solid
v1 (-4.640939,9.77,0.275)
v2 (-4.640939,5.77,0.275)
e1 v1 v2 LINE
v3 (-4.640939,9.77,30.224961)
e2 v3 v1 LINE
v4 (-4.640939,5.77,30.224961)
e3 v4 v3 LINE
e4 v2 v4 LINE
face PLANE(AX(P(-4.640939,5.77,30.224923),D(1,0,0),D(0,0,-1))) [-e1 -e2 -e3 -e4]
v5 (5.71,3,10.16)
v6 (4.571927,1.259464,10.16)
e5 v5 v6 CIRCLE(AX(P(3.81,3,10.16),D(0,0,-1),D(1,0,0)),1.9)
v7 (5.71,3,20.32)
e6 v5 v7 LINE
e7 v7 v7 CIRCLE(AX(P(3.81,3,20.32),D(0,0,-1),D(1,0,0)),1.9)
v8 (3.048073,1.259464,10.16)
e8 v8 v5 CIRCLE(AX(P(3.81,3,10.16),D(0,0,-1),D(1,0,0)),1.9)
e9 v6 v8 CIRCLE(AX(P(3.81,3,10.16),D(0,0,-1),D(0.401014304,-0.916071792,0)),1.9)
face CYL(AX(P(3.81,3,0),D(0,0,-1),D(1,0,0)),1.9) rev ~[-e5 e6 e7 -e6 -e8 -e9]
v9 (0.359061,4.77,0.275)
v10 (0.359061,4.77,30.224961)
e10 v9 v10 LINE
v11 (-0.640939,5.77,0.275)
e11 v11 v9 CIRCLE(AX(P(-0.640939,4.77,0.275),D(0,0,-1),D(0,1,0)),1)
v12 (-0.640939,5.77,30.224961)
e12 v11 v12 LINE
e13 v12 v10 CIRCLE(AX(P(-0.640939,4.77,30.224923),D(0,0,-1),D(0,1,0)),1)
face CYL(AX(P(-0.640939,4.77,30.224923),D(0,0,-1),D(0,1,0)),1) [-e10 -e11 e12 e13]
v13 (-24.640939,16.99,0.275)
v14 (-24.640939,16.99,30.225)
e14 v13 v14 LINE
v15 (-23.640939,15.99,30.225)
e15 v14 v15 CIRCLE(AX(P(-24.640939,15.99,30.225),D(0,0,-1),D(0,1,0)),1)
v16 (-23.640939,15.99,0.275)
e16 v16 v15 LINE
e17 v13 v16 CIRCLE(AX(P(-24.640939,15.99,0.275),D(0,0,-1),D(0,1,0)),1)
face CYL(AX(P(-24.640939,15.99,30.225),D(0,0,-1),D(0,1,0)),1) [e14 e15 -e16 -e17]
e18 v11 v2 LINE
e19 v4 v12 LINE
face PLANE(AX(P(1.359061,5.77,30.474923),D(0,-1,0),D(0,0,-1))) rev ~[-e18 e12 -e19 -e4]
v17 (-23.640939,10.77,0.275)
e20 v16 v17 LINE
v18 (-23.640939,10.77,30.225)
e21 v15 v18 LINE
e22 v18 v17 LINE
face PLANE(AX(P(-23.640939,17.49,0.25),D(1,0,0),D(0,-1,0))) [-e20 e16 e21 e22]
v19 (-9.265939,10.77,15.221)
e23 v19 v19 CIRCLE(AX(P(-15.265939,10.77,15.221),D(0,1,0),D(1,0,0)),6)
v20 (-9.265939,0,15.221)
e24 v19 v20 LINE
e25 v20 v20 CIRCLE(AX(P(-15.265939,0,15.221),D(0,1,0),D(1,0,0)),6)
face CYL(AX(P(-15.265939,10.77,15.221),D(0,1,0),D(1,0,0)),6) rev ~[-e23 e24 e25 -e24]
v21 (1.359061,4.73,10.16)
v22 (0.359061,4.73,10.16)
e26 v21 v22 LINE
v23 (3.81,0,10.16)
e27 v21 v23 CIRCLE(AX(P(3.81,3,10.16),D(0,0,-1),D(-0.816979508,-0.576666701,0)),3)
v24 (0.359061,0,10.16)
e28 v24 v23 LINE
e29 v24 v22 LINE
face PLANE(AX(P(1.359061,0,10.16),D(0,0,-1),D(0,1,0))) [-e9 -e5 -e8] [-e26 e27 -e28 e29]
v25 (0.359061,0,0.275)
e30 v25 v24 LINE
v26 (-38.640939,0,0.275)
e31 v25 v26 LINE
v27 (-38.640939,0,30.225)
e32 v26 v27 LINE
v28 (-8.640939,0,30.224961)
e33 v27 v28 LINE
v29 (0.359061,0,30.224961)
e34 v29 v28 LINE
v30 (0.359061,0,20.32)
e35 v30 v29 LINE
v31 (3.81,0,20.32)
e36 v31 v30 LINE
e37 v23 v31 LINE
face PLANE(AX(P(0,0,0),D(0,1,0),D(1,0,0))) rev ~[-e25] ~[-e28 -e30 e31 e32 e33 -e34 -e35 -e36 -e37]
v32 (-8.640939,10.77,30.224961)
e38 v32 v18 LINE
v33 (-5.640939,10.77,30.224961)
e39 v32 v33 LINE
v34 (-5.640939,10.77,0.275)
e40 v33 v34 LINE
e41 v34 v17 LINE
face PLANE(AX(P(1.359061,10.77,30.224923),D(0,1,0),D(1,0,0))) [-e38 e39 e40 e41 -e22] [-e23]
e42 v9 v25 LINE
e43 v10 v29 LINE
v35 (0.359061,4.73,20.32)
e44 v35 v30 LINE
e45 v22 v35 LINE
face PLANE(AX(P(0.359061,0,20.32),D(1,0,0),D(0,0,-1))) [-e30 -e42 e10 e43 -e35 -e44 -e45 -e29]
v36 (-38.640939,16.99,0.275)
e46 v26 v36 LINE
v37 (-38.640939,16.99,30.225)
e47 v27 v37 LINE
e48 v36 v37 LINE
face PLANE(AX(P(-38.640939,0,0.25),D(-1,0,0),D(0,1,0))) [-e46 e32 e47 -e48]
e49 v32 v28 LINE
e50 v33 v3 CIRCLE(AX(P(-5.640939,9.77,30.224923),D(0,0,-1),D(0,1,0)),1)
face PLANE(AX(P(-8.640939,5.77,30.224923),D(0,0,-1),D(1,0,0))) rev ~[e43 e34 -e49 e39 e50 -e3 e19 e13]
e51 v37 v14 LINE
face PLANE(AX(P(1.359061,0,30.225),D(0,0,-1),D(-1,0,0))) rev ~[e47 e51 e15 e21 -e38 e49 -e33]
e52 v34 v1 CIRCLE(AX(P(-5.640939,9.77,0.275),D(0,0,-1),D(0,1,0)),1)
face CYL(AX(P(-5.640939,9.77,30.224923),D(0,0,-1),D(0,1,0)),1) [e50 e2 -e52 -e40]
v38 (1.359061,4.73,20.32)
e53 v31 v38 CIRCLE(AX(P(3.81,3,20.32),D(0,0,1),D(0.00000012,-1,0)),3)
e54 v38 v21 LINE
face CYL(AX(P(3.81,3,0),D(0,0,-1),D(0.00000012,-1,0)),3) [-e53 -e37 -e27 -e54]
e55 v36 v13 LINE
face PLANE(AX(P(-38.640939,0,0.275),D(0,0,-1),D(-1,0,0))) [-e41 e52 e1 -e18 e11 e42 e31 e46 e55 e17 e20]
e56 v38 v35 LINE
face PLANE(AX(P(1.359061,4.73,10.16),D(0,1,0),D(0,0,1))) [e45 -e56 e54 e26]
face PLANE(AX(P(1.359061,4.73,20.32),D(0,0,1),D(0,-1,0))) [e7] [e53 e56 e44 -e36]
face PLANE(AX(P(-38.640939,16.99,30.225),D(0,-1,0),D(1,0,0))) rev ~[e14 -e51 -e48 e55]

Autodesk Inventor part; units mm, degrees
ref_plane "YZ Plane" through (0, 0, 0) normal (1, 0, 0) x (0, 1, 0)
sketch "Sketch1" plane through (0, 0, 0) normal (0, 0, 1) x (1, 0, 0)
  line L0 (0, 0) -> (3.81, 0)
  line L1 (0, 0) -> (0, 1.27)
  arc A0 (3.81, 0) -> (1.359061, 1.27) centre (3.81, 3) ccw
  circle A1 centre (3.81, 3) radius 1.9
  line L2 (0, 1.27) -> (1.359061, 1.27)
  dimension "d0" = 3.81
  dimension "d1" = 1.27
  dimension "d2" = 6
  dimension "d3" = 3.8
extrude "Extrusion1" add sketch "Sketch1" along normal blind 30.48
ref_plane "Work Plane1" through (0, 0, 20.32) normal (0, 0, 1) x (1, 0, 0)
sketch "Sketch2" plane through (0, 0, 20.32) normal (0, 0, 1) x (1, 0, 0)
  arc A0 (3.81, 0) -> (1.359061, 1.27) centre (3.81, 3) ccw
  line L0 (2.54, 1.27) -> (2.54, 0)
  line L1 (0, 0) -> (3.81, 0)
  line L2 (2.54, 0) -> (3.81, 0)
  circle A1 centre (3.81, 3) radius 0.762
sketch "Sketch2 outline for Extrusion5" plane through (0, 0, 20.32) normal (0, 0, 1) x (1, 0, 0)
  line L0 (2.54, 0) -> (3.81, 0)
  line L1 (1.359061, 1.27) -> (2.54, 0)
  arc A0 (3.81, 0) -> (1.359061, 1.27) centre (3.81, 3) ccw
  circle A1 centre (3.81, 3) radius 0.762
extrude "Extrusion5" cut sketch "Sketch2 outline for Extrusion5" along normal blind 25.4
ref_plane "Work Plane3" through (0, 0, 10.16) normal (0, 0, -1) x (-1, 0, 0)
sketch "Sketch6" plane through (0, 0, 10.16) normal (0, 0, -1) x (-1, 0, 0)
  line L0 (-1.359061, 1.27) -> (-2.54, 0)
  line L1 (-1.359061, 1.27) -> (-2.54, 0)
  circle A0 centre (-3.81, 1.27) radius 0.762
  arc A1 (-1.359061, 1.27) -> (-3.81, 0) centre (-3.81, 3) ccw
  line L2 (-2.54, 0) -> (-3.81, 0)
  point P0 (0, 0)
extrude "Extrusion6" cut sketch "Sketch6" along normal blind 25.4
sketch "Sketch8" plane through (0, 0, 30.48) normal (0, 0, 1) x (1, 0, 0)
  line L0 (1.633512, 1.27) -> (1.633512, 0)
  line L1 (1.633512, 1.27) -> (1.633512, 0)
  line L2 (1.359061, 1.27) -> (2.54, 0)
  line L3 (1.633512, 0) -> (2.54, 0)
  line L4 (1.359061, 1.27) -> (0, 1.27)
  line L5 (2.54, 0) -> (1.633512, 1.27)
  point P0 (0, 0)
extrude "Extrusion8" cut sketch "Sketch8" against normal blind 10.16
sketch "Sketch9" plane through (0, 0, 0) normal (0, 0, -1) x (-1, 0, 0)
  arc A0 (-4.571927, 1.259464) -> (-3.048073, 1.259464) centre (-3.81, 1.27) ccw
  arc A1 (-4.571927, 1.259464) -> (-3.048073, 1.259464) centre (-3.81, 3) ccw
  point P0 (0, 0)
extrude "Extrusion9" cut sketch "Sketch9" against normal blind 10.16
sketch "Sketch10" plane through (0, 0, 0) normal (0, 0, -1) x (-1, 0, 0)
  line L0 (-1.359061, 1.27) -> (0, 1.27)
  line L1 (-1.359061, 1.27) -> (-1.359061, 0)
  line L2 (-1.359061, 0) -> (-2.542741, 0)
  line L3 (-2.542741, 0) -> (-1.359061, 1.27)
  point P0 (0, 0)
extrude "Extrusion10" cut sketch "Sketch10" against normal blind 10.16
sketch "Sketch11" plane through (0, 0, 30.48) normal (0, 0, 1) x (1, 0, 0)
  line L0 (1.359061, 1.27) -> (1.633512, 1.27)
  line L1 (1.359061, 1.27) -> (1.633512, 0.974851)
  line L2 (1.633512, 1.27) -> (1.633512, 0.974851)
  line L3 (1.633512, 0.974851) -> (1.359061, 1.27)
  point P0 (0, 0)
extrude "Extrusion11" add sketch "Sketch11" against normal blind 10.16
sketch "Sketch12" plane through (0, 1.27, 30.48) normal (0, 1, 0) x (1, 0, 0)
  line L0 (1.359061, 30.48) -> (1.359061, 20.32)
  line L1 (1.359061, 30.48) -> (-8.640939, 30.48)
  line L2 (-8.640939, 30.48) -> (-8.640939, 0)
  line L3 (-8.640939, 0) -> (1.359061, 0)
  line L4 (1.359061, 0) -> (1.359061, 30.48)
  point P0 (0, 30.48)
  dimension "d34" = 10
extrude "Extrusion12" add sketch "Sketch12" against normal blind 1.27
sketch "Sketch13" plane through (1.633512, 1.27, 30.48) normal (0, 1, 0) x (1, 0, 0)
  line L0 (-0.274451, 30.48) -> (-0.274451, 20.32)
  line L1 (-0.274451, 20.32) -> (-0.274451, 0)
  line L2 (-0.274451, 0) -> (1.648434, 0)
  line L3 (1.648434, 0) -> (1.648434, 10.16)
  line L4 (2.176488, 10.16) -> (0, 10.16)
  line L5 (-0.274451, 10.16) -> (1.648434, 10.16)
  point P0 (-1.633512, 30.48)
extrude "Extrusion13" cut sketch "Sketch13" against normal blind 1.27
sketch "Sketch14" plane through (1.359061, 0, 0) normal (1, 0, 0) x (0, 0, -1)
  line L0 (-30.474923, 6.35) -> (0.005077, 6.35)
  line L1 (0.005077, 6.35) -> (0.005077, 0)
  line L2 (0, 1.27) -> (-30.48, 1.27)
  line L3 (0, 1.27) -> (-30.474923, 1.27)
  line L4 (-30.474923, 1.27) -> (-30.474923, 5.77)
  line L5 (-30.474923, 5.77) -> (0, 5.77)
  line L6 (0, 5.77) -> (0, 1.27)
  point P0 (0, 0)
  dimension "d39" = 4.5
extrude "Extrusion14" add sketch "Sketch14" against normal blind 10
sketch "Sketch15" plane through (1.359061, 0, 20.32) normal (1, 0, 0) x (0, 0, -1)
  line L0 (-10.154923, 5.77) -> (20.32, 5.77)
  line L1 (20.32, 0) -> (20.07, 0)
  line L2 (20.07, 0) -> (20.07, 5.77)
  line L3 (20.07, 5.77) -> (20.32, 5.77)
  line L4 (20.32, 5.77) -> (20.32, 0)
  line L5 (-10.154923, 5.77) -> (20.32, 5.77)
  line L6 (5.082538, 5.77) -> (5.082538, 11.076995)
  line L7 (-10.154923, 0) -> (-9.904923, 0)
  line L8 (-9.904923, 0) -> (-9.904923, 5.77)
  line L9 (-10.154923, 5.77) -> (-10.154923, 0)
  line L10 (-10.154923, 0) -> (-9.904923, 0)
  line L11 (-9.904923, 0) -> (-9.904923, 5.77)
  line L12 (-9.904923, 5.77) -> (-10.154923, 5.77)
  line L13 (-10.154923, 5.77) -> (-10.154923, 0)
  dimension "d42" = 0.25
extrude "Extrusion15" cut sketch "Sketch15" against normal blind 10
sketch "Sketch16" plane through (1.359061, 0, 30.474923) normal (0, 0, -1) x (-1, 0, 0)
  line L0 (0, 1.27) -> (10, 1.27) projected
  line L1 (0, 0) -> (0, 1.27) projected
  line L2 (10, 0) -> (0, 0) projected
  line L3 (10, 1.27) -> (10, 0) projected
  point P0 (1.359061, 0)
extrude "Extrusion16" cut sketch "Sketch16" against normal blind 10
sketch "Sketch17" plane through (1.359061, 5.77, 30.224923) normal (0, 1, 0) x (1, 0, 0)
  line L0 (-5, 33.422895) -> (-5, -3.422186)
  line L1 (0, 29.974923) -> (-10, 29.974923)
  line L2 (-10, 0) -> (-10, 29.974923)
  line L3 (-5, 29.974923) -> (-10, 29.974923)
  line L4 (-10, 29.974923) -> (-10, 0)
  line L5 (-10, 0) -> (-5, 0)
  line L6 (-5, 0) -> (-5, 29.974923)
  point P0 (-1.359061, 30.224923)
extrude "Extrusion17" add sketch "Sketch17" along normal blind 5
sketch "Sketch18" plane through (1.359061, 0, 0.25) normal (0, 0, -1) x (-1, 0, 0)
  line L0 (40, 0) -> (40, 21.034494)
  line L1 (40, 37.49) -> (40, 17.49)
  line L2 (10, 10.77) -> (5, 10.77)
  line L3 (10, 10.77) -> (40, 10.77)
  line L4 (40, 10.77) -> (40, 0)
  line L5 (40, 0) -> (10, 0)
  line L6 (10, 0) -> (10, 10.77)
  line L7 (25, 10.77) -> (40, 10.77)
  line L8 (40, 10.77) -> (40, 17.49)
  line L9 (40, 17.49) -> (25, 17.49)
  line L10 (25, 17.49) -> (25, 10.77)
  point P0 (1.359061, 0)
extrude "Extrusion18" add sketch "Sketch18" against normal blind 29.975
sketch "Sketch19" plane through (1.359061, 10.77, 30.224923) normal (0, 1, 0) x (1, 0, 0)
  circle A0 centre (-16.625, 15.003923) radius 6
  circle A1 centre (-16.625, 15.003923) radius 4.85
  point P0 (-1.359061, 30.224923)
  dimension "d51" = 12
extrude "Extrusion19" cut sketch "Sketch19" against normal blind 29.975 contours A0 | A1
sketch "Sketch20" plane through (1.359061, 0, 30.225) normal (0, 0, 1) x (1, 0, 0)
  line L0 (-25, 17.49) -> (-25, 10.77) projected
  line L1 (-40, 0) -> (-40, 17.49) projected
  line L2 (-25, 17.49) -> (-40, 17.49)
  line L3 (-40, 17.49) -> (-40, 16.99)
  line L4 (-40, 16.99) -> (-25, 16.99)
  line L5 (-25, 16.99) -> (-25, 17.49)
  point P0 (-1.359061, 0)
  dimension "d54" = 0.5
extrude "Extrusion20" cut sketch "Sketch20" against normal blind 584.2
sketch "Sketch21" plane through (1.359061, 0, 20.32) normal (1, 0, 0) x (0, 0, -1)
  line L0 (20.07, 0) -> (20.07, 5.77)
  line L1 (-9.904923, 5.77) -> (20.07, 5.77)
  line L2 (-9.904923, 5.77) -> (-9.904923, 0)
  line L3 (0, 0) -> (-9.904923, 0)
  line L4 (0, 4.73) -> (0, 0)
  line L5 (10.16, 4.73) -> (0, 4.73)
  line L6 (10.16, 0) -> (10.16, 4.73)
  line L7 (20.07, 0) -> (10.16, 0)
  point P0 (20.32, 0)
extrude "Extrusion21" cut sketch "Sketch21" against normal blind 1
sketch "Sketch22" plane through (-3.640939, 5.77, 30.224923) normal (1, 0, 0) x (0, 0, -1)
  line L0 (0, 0) -> (0, 5)
  line L1 (0, 5) -> (29.974923, 5)
  line L2 (29.974923, 0) -> (29.974923, 5)
  line L3 (29.974923, 0) -> (0, 0)
  point P0 (30.224923, -5.77)
extrude "Extrusion22" cut sketch "Sketch22" against normal blind 1
fillet "Fillet1" radius 1 3 edges at (-23.6409, 16.99, 15.2375) (-4.6409, 10.77, 15.2375) (0.3591, 5.77, 15.2375)
sketch "Sketch23" plane through (1.359061, 0, 30.225) normal (0, 0, 1) x (1, 0, 0)
  spline S0 degree 3 poles (-15.287382, 7.562173) (-14.295298, 10.29556) (-13.653422, 13.152751) (-13.101138, 18.99204) (-13.207044, 21.960303) (-14.220005, 28.120528) (-15.237278, 31.317012) (-16.686921, 34.297861) knots -3.03465801 -3.03465801 -3.03465801 -3.03465801 -2.16997566 -2.16997566 -1.29383861 -1.29383861 -0.2991038 -0.2991038 -0.2991038 -0.2991038
  arc A0 (-25, 15.99) -> (-26, 16.99) centre (-26, 15.99) ccw
  line L0 (-26, 16.99) -> (-40, 16.99)
  line L1 (-40, 16.99) -> (-40, 0)
  line L2 (-40, 0) -> (-10, 0)
  line L3 (-10, 0) -> (-10, 10.77)
  line L4 (-10, 10.77) -> (-25, 10.77)
  line L5 (-25, 10.77) -> (-25, 15.99)
  arc A1 (-1, 4.77) -> (-2, 5.77) centre (-2, 4.77) ccw
  line L6 (-6, 5.77) -> (-2, 5.77)
  line L7 (-6, 5.77) -> (-6, 9.77)
  arc A2 (-6, 9.77) -> (-7, 10.77) centre (-7, 9.77) ccw
  line L8 (-10, 10.77) -> (-7, 10.77)
  line L9 (-10, 0) -> (-10, 10.77)
  line L10 (-1, 0) -> (-10, 0)
  line L11 (-1, 0) -> (-1, 4.77)
  point P0 (-1.359061, 0)
extrude "Extrusion23" add sketch "Sketch23" against normal blind 0.025
sketch "Sketch24" plane through (-38.640939, 0, 0.25) normal (0, 0, -1) x (-1, 0, 0)
  arc A0 (-38, 5.77) -> (-39, 4.77) centre (-38, 4.77) ccw projected
  line L0 (-39, 4.77) -> (-39, 0) projected
  line L1 (-39, 0) -> (0, 0) projected
  line L2 (0, 0) -> (0, 16.99) projected
  line L3 (0, 16.99) -> (-14, 16.99) projected
  arc A1 (-14, 16.99) -> (-15, 15.99) centre (-14, 15.99) ccw projected
  line L4 (-15, 15.99) -> (-15, 10.77) projected
  line L5 (-33, 10.77) -> (-15, 10.77) projected
  arc A2 (-33, 10.77) -> (-34, 9.77) centre (-33, 9.77) ccw projected
  line L6 (-34, 9.77) -> (-34, 5.77) projected
  line L7 (-38, 5.77) -> (-34, 5.77) projected
  point P0 (-38.640939, 0)
extrude "Extrusion24" cut sketch "Sketch24" against normal blind 0.025
properties part number "Hinge, Explosion Button"
